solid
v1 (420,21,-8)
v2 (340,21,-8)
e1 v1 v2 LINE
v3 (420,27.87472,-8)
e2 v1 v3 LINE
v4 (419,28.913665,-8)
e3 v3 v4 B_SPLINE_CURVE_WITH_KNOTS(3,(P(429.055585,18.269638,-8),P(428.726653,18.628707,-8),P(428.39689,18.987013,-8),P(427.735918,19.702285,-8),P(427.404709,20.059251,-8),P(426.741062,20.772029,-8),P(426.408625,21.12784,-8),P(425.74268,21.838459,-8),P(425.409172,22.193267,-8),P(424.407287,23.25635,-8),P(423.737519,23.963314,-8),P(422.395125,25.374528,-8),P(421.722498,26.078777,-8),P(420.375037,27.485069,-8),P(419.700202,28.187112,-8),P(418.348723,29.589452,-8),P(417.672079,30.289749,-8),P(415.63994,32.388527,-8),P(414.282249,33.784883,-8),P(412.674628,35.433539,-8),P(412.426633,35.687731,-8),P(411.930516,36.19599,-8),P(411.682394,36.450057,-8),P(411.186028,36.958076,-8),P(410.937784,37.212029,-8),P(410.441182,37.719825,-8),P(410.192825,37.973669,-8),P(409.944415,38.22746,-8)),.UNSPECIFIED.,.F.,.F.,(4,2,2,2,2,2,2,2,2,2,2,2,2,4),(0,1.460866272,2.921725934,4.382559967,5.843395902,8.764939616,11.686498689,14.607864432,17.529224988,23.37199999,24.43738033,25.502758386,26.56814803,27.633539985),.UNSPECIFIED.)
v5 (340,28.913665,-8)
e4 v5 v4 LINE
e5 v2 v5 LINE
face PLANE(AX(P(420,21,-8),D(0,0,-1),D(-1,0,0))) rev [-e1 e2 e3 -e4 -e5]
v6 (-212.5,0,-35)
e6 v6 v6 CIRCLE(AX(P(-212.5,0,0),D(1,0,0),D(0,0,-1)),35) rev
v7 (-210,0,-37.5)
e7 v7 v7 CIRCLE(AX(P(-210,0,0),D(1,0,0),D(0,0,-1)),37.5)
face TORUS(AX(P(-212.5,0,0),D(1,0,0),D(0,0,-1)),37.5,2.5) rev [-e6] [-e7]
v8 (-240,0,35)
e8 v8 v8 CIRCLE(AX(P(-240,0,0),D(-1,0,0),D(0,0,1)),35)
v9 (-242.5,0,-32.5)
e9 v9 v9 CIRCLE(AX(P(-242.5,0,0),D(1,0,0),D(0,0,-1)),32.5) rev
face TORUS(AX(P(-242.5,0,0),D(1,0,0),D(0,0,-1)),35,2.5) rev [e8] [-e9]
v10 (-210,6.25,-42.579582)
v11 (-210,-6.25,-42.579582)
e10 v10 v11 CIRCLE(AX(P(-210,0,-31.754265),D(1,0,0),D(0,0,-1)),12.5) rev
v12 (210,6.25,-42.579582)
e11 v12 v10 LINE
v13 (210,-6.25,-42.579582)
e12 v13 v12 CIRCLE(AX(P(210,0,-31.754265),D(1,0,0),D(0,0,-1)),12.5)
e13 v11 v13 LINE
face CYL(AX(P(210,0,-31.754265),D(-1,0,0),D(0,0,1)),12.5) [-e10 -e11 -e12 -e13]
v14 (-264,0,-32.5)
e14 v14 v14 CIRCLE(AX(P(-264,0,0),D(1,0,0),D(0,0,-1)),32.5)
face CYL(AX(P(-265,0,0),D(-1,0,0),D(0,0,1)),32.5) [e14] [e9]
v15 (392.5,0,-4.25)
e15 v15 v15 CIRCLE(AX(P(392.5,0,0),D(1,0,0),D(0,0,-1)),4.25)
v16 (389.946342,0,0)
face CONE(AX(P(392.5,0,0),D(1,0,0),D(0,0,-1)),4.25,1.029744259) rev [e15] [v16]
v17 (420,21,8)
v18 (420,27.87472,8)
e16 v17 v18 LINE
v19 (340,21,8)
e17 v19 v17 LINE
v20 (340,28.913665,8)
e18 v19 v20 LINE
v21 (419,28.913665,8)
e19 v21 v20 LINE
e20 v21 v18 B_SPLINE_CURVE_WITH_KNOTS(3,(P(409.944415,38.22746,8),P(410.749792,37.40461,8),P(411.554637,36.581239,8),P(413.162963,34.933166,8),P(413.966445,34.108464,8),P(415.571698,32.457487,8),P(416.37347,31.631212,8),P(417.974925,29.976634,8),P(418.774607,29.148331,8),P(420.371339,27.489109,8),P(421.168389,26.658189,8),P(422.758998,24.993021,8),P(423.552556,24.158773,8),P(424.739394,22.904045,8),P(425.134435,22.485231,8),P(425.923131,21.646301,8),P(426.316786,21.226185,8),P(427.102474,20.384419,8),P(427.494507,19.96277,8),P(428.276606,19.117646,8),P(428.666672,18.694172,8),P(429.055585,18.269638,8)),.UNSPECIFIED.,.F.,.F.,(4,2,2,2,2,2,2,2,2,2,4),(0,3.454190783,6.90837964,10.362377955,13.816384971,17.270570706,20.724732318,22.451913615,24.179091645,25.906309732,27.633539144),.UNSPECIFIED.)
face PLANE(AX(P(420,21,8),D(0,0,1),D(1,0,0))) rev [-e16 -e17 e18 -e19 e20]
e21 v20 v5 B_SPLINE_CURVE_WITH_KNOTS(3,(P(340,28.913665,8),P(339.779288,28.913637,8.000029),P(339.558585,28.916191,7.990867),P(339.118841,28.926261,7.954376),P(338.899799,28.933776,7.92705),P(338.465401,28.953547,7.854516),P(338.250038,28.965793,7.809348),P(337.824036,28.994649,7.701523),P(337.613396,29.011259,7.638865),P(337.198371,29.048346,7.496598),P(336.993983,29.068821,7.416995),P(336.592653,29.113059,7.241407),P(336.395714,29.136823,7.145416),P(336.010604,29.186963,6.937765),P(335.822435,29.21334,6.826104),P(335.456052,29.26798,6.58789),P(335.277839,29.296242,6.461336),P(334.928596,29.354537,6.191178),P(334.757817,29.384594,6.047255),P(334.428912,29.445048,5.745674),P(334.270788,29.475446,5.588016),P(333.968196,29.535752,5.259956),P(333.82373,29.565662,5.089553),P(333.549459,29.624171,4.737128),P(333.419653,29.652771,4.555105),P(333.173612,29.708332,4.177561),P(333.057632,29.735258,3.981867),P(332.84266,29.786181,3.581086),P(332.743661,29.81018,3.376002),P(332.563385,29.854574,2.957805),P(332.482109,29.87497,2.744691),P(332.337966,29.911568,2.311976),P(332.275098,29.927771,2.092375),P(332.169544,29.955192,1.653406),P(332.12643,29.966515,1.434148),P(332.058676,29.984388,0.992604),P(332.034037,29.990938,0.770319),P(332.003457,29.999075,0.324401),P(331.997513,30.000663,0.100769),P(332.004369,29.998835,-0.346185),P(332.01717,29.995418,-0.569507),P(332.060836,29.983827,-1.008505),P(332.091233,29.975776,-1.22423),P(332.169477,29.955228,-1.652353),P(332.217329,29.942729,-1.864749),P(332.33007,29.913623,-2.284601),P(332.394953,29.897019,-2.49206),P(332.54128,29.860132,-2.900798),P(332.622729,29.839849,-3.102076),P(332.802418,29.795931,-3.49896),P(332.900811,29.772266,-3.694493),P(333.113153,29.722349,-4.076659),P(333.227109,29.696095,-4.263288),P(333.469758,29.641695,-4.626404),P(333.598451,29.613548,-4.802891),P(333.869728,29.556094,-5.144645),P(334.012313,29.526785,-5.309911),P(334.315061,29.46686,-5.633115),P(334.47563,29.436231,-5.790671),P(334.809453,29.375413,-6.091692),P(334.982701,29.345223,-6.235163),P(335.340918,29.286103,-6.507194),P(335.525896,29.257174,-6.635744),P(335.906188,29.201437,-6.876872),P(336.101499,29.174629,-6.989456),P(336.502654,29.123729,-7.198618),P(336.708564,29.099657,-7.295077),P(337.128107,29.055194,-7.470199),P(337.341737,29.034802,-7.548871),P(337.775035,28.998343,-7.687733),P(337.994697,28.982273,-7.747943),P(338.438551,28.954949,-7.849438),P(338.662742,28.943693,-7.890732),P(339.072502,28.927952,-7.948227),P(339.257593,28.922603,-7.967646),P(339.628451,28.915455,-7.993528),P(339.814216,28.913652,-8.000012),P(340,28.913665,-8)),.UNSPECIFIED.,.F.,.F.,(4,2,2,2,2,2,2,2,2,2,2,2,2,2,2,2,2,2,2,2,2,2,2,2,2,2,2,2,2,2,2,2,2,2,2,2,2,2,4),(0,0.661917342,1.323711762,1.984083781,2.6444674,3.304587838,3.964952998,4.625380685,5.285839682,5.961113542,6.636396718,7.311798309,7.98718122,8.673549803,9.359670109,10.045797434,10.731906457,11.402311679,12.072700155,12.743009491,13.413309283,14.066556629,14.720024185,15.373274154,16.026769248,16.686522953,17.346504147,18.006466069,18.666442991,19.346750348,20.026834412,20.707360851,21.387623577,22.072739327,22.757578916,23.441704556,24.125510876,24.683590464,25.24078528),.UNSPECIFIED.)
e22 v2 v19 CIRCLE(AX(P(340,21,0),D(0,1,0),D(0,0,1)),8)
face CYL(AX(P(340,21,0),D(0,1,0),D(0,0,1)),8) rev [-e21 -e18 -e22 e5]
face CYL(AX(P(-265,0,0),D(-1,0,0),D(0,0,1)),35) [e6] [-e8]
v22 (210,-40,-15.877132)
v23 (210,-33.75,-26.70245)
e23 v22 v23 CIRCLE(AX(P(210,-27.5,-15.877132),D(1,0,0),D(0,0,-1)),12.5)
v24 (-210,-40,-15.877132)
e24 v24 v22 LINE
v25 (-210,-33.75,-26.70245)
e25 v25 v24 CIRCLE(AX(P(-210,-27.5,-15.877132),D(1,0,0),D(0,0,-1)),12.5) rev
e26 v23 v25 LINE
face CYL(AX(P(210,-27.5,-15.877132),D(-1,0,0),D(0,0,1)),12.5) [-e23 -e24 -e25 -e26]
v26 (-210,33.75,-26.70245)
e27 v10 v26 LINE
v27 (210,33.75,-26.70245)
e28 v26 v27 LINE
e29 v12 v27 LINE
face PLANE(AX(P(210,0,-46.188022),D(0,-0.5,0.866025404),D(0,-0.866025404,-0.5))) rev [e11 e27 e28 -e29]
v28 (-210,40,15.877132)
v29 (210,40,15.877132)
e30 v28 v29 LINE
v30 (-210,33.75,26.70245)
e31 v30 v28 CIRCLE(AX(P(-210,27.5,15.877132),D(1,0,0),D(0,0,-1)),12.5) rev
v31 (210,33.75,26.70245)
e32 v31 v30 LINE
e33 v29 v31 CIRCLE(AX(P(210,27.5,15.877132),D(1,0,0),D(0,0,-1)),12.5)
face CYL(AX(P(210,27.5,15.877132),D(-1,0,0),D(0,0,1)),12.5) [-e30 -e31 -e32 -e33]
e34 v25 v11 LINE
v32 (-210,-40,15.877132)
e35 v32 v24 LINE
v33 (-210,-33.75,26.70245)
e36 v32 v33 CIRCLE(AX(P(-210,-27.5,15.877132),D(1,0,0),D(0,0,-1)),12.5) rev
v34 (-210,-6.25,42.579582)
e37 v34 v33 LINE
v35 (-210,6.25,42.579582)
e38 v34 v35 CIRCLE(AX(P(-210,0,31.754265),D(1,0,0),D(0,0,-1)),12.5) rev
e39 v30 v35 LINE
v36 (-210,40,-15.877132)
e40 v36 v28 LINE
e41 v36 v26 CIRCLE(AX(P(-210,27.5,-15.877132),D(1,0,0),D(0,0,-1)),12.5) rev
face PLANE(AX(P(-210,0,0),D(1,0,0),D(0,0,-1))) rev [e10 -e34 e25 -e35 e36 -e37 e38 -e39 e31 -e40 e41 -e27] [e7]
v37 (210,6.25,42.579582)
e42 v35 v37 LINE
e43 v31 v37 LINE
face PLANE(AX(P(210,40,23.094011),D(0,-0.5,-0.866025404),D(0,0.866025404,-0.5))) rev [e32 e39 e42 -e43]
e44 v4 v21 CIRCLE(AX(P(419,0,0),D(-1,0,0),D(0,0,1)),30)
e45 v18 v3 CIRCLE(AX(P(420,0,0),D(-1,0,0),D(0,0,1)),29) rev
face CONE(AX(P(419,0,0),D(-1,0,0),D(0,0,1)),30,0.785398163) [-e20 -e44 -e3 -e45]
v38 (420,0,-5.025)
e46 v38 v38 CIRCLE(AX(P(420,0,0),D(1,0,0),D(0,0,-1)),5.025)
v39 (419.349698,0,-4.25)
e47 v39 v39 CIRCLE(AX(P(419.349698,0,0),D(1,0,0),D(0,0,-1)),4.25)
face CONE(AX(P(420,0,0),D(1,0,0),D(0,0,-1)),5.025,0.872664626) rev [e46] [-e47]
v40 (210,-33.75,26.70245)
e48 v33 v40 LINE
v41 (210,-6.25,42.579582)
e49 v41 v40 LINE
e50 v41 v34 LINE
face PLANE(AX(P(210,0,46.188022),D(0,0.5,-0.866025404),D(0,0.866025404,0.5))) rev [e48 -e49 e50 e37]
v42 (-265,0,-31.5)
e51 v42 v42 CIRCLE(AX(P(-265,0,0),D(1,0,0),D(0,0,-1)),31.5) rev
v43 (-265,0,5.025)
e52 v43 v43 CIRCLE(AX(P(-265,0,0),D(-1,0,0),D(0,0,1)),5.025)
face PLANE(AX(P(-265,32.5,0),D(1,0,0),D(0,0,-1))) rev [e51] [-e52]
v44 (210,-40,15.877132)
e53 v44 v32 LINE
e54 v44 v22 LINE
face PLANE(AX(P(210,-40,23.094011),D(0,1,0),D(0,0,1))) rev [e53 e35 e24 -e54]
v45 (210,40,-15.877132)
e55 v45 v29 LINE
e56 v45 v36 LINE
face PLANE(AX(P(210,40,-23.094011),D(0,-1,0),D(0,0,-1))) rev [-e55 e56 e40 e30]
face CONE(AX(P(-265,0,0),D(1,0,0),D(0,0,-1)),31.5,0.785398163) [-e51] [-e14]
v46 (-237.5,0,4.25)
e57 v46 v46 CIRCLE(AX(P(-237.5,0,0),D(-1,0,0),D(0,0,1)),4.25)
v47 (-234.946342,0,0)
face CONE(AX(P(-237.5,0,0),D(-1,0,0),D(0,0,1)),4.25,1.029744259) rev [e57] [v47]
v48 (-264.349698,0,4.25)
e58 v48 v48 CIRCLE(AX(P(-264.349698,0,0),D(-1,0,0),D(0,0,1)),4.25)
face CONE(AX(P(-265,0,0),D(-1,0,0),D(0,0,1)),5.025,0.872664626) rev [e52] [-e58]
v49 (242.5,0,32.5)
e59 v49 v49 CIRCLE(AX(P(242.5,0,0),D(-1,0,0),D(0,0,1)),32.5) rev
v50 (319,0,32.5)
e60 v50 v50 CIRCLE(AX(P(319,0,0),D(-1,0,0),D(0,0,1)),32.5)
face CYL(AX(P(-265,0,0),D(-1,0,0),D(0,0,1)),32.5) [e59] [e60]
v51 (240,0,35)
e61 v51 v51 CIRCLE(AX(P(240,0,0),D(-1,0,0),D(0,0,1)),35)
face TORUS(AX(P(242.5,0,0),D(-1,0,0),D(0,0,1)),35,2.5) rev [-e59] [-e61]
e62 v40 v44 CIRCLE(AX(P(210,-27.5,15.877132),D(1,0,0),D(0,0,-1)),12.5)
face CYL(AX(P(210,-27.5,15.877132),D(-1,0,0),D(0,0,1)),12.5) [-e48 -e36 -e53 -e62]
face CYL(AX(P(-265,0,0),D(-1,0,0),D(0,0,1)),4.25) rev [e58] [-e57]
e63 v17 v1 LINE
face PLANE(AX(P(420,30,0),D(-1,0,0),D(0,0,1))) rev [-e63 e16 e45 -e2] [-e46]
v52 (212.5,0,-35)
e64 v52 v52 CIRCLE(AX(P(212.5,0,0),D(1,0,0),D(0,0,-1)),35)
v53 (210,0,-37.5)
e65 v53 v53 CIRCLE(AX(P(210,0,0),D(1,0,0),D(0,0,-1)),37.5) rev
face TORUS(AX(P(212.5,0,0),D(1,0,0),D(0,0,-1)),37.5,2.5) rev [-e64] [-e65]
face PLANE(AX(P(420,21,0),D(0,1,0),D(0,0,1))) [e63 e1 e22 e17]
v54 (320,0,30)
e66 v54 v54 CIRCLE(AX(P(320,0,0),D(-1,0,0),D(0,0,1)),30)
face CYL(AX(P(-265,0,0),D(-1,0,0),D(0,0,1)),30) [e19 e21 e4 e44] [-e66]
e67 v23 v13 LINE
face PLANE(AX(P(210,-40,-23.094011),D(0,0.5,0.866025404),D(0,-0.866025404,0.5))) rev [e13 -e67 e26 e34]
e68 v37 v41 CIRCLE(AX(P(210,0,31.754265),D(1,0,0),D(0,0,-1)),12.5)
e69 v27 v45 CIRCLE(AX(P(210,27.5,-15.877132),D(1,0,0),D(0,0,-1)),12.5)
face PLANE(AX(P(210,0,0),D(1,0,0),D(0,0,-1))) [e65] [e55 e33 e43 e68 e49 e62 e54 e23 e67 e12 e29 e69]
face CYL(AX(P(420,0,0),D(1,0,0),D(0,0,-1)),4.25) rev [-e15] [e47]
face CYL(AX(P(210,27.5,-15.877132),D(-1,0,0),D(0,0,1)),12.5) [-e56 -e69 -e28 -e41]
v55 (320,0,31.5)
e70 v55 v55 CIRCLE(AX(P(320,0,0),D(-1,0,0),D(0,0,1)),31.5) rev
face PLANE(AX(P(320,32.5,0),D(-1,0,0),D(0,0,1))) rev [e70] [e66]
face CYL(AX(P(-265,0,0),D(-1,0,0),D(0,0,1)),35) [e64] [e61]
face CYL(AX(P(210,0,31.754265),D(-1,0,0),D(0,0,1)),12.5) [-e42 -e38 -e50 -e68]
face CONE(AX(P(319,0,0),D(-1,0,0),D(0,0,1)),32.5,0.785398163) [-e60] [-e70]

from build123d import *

# Parameters (mm, degrees)
BOSS_EXTRUDE3_DEPTH                    = 210
FILLET1_R                              = 2.5
FILLET2_R                              = 12.5
CHAMFER1_SIZE                          = 1
M10_TAPPED_HOLE1_D                     = 8.5
M10_TAPPED_HOLE1_DEPTH                 = 27.5
M10_TAPPED_HOLE1_CSINK_D               = 10.05
M10_TAPPED_HOLE1_CSINK_ANGLE           = 100
M10_TAPPED_HOLE1_TIP                   = 2.553657631
M10_TAPPED_HOLE1_ON_FACE_2_D           = 8.5
M10_TAPPED_HOLE1_ON_FACE_2_DEPTH       = 27.5
M10_TAPPED_HOLE1_ON_FACE_2_CSINK_D     = 10.05
M10_TAPPED_HOLE1_ON_FACE_2_CSINK_ANGLE = 100
M10_TAPPED_HOLE1_ON_FACE_2_TIP         = 2.553657631
CUT_EXTRUDE1_DEPTH                     = 9


with BuildPart() as part:
    # Sketch1 → Boss-Extrude3 (new, symmetric)
    with BuildSketch(Plane(origin=(0, 0, 0), x_dir=(0, 0, -1), z_dir=(1, 0, 0))):
        Polygon((23.094010768, -40), (46.188021535, 0), (23.094010768, 40), (-23.094010768, 40), (-46.188021535, 0), (-23.094010768, -40), align=None)
    extrude(amount=BOSS_EXTRUDE3_DEPTH, both=True)

    # Sketch3 → Revolve1 (revolve)
    with BuildSketch(Plane.XY, mode=Mode.PRIVATE) as revolve1_sk:
        Polygon((-210, 35), (-240, 35), (-240, 32.5), (-265, 32.5), (-265, 0), (-210, 0), align=None)
        Polygon((210, 35), (240, 35), (240, 32.5), (320, 32.5), (320, 30), (420, 30), (420, 0), (210, 0), align=None)
    revolve(revolve1_sk.sketch.rotate(Axis((-265, 0, 0), (1, 0, 0)), 90), axis=Axis((-265, 0, 0), (1, 0, 0)))

    # Fillet1
    fillet1_edges = [part.edges().sort_by_distance(p)[0] for p in [
        (-210, 0, -35),
        (-240, 0, -32.5),
        (210, 0, -35),
        (240, 0, -32.5),
    ]]
    fillet(fillet1_edges, radius=FILLET1_R - 0.0001)  # a hair under: the kernel refuses the full size

    # Fillet2
    fillet2_edges = [part.edges().sort_by_distance(p)[0] for p in [
        (0, -40, 23.094010768),
        (0, 0, 46.188021535),
        (0, 40, 23.094010768),
        (0, 40, -23.094010768),
        (0, 0, -46.188021535),
        (0, -40, -23.094010768),
    ]]
    fillet(fillet2_edges, radius=FILLET2_R)

    # Chamfer1
    chamfer1_edges = [part.edges().sort_by_distance(p)[0] for p in [
        (-265, 0, -32.5),
        (320, 0, -32.5),
        (420, 0, -30),
    ]]
    chamfer(chamfer1_edges, length=CHAMFER1_SIZE)

    # M10 Tapped Hole1
    with Locations(Plane(origin=(-265, 0, 0), x_dir=(0, 0, -1), z_dir=(-1, 0, 0))):
        with Locations((0, 0)):
            CounterSinkHole(M10_TAPPED_HOLE1_D / 2, M10_TAPPED_HOLE1_CSINK_D / 2, depth=M10_TAPPED_HOLE1_DEPTH, counter_sink_angle=M10_TAPPED_HOLE1_CSINK_ANGLE)
            with Locations((0, 0, -(M10_TAPPED_HOLE1_DEPTH + M10_TAPPED_HOLE1_TIP / 2))):  # 118° drill point
                Cone(0, M10_TAPPED_HOLE1_D / 2, M10_TAPPED_HOLE1_TIP, mode=Mode.SUBTRACT)

    # M10 Tapped Hole1 on face 2
    with Locations(Plane(origin=(420, 0, 0), x_dir=(0, 0, 1), z_dir=(1, 0, 0))):
        with Locations((0, 0)):
            CounterSinkHole(M10_TAPPED_HOLE1_ON_FACE_2_D / 2, M10_TAPPED_HOLE1_ON_FACE_2_CSINK_D / 2, depth=M10_TAPPED_HOLE1_ON_FACE_2_DEPTH, counter_sink_angle=M10_TAPPED_HOLE1_ON_FACE_2_CSINK_ANGLE)
            with Locations((0, 0, -(M10_TAPPED_HOLE1_ON_FACE_2_DEPTH + M10_TAPPED_HOLE1_ON_FACE_2_TIP / 2))):  # 118° drill point
                Cone(0, M10_TAPPED_HOLE1_ON_FACE_2_D / 2, M10_TAPPED_HOLE1_ON_FACE_2_TIP, mode=Mode.SUBTRACT)

    # Sketch7 → Cut-Extrude1 (cut)
    with BuildSketch(Plane(origin=(0, 30, 0), x_dir=(1, 0, 0), z_dir=(0, 1, 0))):
        with BuildLine():
            Line((420, -8), (340, -8))
            ThreePointArc((340, -8), (332, 0), (340, 8))
            Line((340, 8), (420, 8))
            ThreePointArc((420, 8), (428, 0), (420, -8))
        make_face()
    extrude(amount=-CUT_EXTRUDE1_DEPTH, mode=Mode.SUBTRACT)


solid = part.part
